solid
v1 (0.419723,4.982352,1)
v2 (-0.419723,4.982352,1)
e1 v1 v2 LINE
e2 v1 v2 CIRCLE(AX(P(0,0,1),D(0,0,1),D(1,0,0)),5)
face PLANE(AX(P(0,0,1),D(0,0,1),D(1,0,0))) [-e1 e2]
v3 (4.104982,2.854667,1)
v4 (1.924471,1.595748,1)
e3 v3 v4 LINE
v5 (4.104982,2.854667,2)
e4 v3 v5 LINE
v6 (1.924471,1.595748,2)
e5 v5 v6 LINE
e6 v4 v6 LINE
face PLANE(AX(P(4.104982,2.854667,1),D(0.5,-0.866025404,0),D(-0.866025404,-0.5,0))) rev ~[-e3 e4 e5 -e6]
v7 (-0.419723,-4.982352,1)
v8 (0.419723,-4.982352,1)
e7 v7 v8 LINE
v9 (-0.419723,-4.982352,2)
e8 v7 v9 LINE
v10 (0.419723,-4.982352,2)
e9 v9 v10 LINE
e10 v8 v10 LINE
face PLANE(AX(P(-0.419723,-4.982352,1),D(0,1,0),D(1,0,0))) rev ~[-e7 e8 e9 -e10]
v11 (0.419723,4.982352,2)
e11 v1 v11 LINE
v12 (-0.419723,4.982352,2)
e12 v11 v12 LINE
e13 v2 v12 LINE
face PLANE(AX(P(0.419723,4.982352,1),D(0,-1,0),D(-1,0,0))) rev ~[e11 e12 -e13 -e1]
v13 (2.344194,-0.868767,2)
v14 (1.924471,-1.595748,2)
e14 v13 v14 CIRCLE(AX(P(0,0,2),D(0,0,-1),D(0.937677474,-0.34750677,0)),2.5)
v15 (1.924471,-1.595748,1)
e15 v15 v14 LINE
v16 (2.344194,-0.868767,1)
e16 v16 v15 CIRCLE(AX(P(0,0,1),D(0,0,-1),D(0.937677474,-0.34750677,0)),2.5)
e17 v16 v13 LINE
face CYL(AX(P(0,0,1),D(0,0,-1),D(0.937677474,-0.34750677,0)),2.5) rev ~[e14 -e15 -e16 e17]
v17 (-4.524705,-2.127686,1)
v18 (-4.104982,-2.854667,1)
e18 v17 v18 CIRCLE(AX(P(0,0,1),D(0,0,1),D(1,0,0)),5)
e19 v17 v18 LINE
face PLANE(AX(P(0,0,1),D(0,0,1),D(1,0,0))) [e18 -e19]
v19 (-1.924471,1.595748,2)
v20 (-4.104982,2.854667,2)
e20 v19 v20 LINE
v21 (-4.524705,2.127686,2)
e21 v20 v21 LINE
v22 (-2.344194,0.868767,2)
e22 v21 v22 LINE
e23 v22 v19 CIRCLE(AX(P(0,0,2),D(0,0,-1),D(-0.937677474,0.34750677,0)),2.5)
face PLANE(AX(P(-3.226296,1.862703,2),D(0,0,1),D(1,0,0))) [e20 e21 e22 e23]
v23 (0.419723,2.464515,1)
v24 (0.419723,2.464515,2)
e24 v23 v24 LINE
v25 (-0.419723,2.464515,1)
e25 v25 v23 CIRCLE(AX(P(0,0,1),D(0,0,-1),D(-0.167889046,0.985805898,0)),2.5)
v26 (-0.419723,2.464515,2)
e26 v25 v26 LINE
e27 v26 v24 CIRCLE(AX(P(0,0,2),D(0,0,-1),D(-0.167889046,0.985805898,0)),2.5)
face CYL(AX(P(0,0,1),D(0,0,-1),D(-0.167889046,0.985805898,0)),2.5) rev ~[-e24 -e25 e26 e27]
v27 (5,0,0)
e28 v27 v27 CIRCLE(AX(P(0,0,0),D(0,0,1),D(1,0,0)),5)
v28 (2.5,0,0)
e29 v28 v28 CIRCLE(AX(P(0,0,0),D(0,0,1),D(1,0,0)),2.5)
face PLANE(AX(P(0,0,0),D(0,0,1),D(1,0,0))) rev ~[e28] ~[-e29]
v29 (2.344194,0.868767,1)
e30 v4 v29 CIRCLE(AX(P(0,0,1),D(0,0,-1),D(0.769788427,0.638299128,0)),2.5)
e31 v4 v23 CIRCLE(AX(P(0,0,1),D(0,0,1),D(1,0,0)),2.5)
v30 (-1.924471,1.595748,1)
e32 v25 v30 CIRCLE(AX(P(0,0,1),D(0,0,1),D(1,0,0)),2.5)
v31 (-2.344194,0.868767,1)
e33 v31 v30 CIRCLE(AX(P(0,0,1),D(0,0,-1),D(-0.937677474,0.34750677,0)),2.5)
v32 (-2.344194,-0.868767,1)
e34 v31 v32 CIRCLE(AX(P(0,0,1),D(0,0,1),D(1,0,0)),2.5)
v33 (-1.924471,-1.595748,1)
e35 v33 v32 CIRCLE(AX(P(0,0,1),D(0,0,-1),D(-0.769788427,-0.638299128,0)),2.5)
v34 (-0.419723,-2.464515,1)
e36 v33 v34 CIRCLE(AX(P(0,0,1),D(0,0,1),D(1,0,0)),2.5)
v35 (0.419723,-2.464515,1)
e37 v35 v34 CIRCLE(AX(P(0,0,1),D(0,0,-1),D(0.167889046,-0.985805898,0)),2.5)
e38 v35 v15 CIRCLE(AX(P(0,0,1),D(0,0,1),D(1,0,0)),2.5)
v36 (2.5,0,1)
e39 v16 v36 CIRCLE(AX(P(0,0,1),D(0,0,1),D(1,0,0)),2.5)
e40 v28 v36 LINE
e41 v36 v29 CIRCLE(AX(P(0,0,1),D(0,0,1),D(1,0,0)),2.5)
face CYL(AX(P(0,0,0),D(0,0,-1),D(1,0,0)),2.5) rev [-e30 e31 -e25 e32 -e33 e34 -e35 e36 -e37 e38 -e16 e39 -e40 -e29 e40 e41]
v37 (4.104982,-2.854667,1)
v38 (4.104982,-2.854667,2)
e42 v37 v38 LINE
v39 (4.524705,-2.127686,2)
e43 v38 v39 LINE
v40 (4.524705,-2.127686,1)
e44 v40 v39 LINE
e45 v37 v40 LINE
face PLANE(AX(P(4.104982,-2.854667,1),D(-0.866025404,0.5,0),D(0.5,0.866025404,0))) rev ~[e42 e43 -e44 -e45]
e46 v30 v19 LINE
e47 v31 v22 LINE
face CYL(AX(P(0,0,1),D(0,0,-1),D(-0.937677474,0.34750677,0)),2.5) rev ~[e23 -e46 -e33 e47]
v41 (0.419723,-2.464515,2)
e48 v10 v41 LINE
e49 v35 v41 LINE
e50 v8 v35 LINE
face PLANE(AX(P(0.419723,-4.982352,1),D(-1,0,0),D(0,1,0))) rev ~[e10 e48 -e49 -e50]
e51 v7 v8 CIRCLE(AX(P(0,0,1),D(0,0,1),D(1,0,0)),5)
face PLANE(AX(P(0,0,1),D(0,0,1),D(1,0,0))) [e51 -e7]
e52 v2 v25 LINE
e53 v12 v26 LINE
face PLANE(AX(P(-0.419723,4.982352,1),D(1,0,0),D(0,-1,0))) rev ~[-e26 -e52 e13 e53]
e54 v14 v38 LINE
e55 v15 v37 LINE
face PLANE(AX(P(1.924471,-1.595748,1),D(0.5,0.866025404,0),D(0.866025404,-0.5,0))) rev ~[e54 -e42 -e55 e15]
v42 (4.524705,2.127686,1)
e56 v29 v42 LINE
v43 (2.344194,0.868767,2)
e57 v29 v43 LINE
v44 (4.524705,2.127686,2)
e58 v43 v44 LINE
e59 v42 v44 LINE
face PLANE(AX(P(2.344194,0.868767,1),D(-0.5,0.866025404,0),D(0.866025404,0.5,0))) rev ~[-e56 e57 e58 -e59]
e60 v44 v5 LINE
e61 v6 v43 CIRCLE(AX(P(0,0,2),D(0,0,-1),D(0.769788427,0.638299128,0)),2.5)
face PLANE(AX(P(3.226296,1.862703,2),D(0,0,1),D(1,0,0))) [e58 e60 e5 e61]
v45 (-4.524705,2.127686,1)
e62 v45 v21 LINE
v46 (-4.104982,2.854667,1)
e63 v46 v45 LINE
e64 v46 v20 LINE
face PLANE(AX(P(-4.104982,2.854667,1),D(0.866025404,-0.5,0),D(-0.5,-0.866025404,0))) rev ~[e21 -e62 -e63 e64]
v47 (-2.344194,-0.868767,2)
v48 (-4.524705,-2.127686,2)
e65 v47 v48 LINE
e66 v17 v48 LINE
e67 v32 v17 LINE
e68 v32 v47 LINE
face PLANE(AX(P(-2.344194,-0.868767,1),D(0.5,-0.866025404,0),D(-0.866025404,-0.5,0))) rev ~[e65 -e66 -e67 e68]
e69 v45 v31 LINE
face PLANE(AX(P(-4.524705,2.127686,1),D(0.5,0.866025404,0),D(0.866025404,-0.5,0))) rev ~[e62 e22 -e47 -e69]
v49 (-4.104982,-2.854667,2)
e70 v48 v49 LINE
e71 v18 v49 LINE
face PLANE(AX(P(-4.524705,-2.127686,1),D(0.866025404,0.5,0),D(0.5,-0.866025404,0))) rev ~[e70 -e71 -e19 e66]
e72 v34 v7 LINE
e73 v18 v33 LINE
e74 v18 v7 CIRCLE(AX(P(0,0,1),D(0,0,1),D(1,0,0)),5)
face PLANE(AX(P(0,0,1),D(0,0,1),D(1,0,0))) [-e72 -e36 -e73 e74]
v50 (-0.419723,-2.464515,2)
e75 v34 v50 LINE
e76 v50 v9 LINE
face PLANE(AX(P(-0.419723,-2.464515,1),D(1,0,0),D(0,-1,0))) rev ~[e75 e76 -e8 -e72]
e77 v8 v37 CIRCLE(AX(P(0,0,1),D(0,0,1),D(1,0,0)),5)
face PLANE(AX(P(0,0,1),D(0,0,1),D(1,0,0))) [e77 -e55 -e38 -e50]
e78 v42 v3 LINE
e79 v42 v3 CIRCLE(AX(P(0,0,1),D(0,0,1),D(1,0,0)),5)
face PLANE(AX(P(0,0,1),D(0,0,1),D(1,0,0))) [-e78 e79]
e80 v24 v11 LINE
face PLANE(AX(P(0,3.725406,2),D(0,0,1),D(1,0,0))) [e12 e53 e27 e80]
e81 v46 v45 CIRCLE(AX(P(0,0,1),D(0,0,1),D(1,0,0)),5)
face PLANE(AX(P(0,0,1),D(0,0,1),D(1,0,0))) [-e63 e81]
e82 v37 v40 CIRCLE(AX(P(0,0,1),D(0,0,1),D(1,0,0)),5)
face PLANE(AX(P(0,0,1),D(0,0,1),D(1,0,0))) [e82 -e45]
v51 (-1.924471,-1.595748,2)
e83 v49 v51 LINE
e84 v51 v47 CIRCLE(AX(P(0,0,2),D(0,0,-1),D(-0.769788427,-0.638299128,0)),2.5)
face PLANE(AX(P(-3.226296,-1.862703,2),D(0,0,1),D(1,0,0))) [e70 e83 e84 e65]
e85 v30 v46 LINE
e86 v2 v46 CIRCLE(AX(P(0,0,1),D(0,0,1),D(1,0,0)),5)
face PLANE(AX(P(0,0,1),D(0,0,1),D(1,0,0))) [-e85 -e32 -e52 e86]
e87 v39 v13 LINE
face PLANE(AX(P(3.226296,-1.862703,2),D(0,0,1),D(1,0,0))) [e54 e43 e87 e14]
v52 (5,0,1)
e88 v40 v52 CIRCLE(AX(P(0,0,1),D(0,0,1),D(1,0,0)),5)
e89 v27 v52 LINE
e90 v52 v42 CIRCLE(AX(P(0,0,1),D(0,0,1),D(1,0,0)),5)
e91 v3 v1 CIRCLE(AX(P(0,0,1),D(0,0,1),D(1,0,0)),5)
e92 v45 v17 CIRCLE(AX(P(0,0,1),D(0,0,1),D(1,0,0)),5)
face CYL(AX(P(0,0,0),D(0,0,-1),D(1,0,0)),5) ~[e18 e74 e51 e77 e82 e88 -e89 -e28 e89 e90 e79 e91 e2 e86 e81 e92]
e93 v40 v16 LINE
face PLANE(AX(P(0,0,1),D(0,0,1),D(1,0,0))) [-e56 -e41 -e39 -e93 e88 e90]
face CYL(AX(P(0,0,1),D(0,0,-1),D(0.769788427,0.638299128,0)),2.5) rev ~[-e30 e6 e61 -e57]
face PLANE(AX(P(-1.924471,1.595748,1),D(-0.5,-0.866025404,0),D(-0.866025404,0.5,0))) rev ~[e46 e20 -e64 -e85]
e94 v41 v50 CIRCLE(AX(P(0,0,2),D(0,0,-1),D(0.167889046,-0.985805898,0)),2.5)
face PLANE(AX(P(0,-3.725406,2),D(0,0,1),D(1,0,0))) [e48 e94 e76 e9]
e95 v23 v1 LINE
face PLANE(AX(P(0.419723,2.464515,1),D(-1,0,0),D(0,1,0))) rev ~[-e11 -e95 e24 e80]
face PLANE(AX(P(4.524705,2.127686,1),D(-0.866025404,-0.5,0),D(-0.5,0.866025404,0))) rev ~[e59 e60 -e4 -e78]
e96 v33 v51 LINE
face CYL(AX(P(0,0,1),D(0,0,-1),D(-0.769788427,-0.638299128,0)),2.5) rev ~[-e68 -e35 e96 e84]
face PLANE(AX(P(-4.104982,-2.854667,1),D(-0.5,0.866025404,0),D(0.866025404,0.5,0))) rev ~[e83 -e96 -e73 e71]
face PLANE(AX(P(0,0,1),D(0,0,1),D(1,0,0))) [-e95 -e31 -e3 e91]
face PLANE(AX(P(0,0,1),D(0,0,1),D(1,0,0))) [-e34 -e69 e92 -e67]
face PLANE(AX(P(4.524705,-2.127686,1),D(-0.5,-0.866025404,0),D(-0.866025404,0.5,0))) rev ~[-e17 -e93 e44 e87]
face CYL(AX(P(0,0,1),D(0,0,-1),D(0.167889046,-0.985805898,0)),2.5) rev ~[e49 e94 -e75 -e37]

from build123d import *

# Parameters (mm, degrees)
F0_R     = 5
F0_R_2   = 2.5
F1_DEPTH = 1
F3_DEPTH = 1


# Not quite as in the source:
# - after a boolean that leaves OpenCascade's solid faulty, fix() repairs it


with BuildPart() as f1:
    # F0 (on Top) → F1 (new body)
    with BuildSketch(Plane.XY):
        Circle(F0_R)
        Circle(F0_R_2, mode=Mode.SUBTRACT)
    extrude(amount=F1_DEPTH)

    # F2 (on face) → F3 (join)
    with BuildSketch(Plane.XY.offset(1)):
        with BuildLine():
            ThreePointArc((-0.4197226159, 2.4645147445), (0, 2.5), (0.4197226159, 2.4645147445))
            Line((0.4197226159, 2.4645147445), (0.4197226159, 4.9823521479))
            Line((0.4197226159, 4.9823521479), (-0.4197226159, 4.9823521479))
            Line((-0.4197226159, 4.9823521479), (-0.4197226159, 2.4645147445))
        make_face()
        with BuildLine():
            ThreePointArc((-2.3441936847, 0.8687669243), (-2.1650635095, 1.25), (-1.9244710687, 1.5957478202))
            Line((-1.9244710687, 1.5957478202), (-4.1049822227, 2.8546665219))
            Line((-4.1049822227, 2.8546665219), (-4.5247048387, 2.127685626))
            Line((-4.5247048387, 2.127685626), (-2.3441936847, 0.8687669243))
        make_face()
        with BuildLine():
            ThreePointArc((-1.9244710687, -1.5957478202), (-2.1650635095, -1.25), (-2.3441936847, -0.8687669243))
            Line((-2.3441936847, -0.8687669243), (-4.5247048387, -2.127685626))
            Line((-4.5247048387, -2.127685626), (-4.1049822227, -2.8546665219))
            Line((-4.1049822227, -2.8546665219), (-1.9244710687, -1.5957478202))
        make_face()
        with BuildLine():
            ThreePointArc((0.4197226159, -2.4645147445), (0, -2.5), (-0.4197226159, -2.4645147445))
            Line((-0.4197226159, -2.4645147445), (-0.4197226159, -4.9823521479))
            Line((-0.4197226159, -4.9823521479), (0.4197226159, -4.9823521479))
            Line((0.4197226159, -4.9823521479), (0.4197226159, -2.4645147445))
        make_face()
        with BuildLine():
            Line((4.5247048387, -2.127685626), (2.3441936847, -0.8687669243))
            ThreePointArc((2.3441936847, -0.8687669243), (2.1650635095, -1.25), (1.9244710687, -1.5957478202))
            Line((1.9244710687, -1.5957478202), (4.1049822227, -2.8546665219))
            Line((4.1049822227, -2.8546665219), (4.5247048387, -2.127685626))
        make_face()
        with BuildLine():
            Line((4.1049822227, 2.8546665219), (1.9244710687, 1.5957478202))
            ThreePointArc((1.9244710687, 1.5957478202), (2.1650635095, 1.25), (2.3441936847, 0.8687669243))
            Line((2.3441936847, 0.8687669243), (4.5247048387, 2.127685626))
            Line((4.5247048387, 2.127685626), (4.1049822227, 2.8546665219))
        make_face()
    extrude(amount=F3_DEPTH)

    add(f1.part.fix(), mode=Mode.REPLACE)


solid = f1.part
